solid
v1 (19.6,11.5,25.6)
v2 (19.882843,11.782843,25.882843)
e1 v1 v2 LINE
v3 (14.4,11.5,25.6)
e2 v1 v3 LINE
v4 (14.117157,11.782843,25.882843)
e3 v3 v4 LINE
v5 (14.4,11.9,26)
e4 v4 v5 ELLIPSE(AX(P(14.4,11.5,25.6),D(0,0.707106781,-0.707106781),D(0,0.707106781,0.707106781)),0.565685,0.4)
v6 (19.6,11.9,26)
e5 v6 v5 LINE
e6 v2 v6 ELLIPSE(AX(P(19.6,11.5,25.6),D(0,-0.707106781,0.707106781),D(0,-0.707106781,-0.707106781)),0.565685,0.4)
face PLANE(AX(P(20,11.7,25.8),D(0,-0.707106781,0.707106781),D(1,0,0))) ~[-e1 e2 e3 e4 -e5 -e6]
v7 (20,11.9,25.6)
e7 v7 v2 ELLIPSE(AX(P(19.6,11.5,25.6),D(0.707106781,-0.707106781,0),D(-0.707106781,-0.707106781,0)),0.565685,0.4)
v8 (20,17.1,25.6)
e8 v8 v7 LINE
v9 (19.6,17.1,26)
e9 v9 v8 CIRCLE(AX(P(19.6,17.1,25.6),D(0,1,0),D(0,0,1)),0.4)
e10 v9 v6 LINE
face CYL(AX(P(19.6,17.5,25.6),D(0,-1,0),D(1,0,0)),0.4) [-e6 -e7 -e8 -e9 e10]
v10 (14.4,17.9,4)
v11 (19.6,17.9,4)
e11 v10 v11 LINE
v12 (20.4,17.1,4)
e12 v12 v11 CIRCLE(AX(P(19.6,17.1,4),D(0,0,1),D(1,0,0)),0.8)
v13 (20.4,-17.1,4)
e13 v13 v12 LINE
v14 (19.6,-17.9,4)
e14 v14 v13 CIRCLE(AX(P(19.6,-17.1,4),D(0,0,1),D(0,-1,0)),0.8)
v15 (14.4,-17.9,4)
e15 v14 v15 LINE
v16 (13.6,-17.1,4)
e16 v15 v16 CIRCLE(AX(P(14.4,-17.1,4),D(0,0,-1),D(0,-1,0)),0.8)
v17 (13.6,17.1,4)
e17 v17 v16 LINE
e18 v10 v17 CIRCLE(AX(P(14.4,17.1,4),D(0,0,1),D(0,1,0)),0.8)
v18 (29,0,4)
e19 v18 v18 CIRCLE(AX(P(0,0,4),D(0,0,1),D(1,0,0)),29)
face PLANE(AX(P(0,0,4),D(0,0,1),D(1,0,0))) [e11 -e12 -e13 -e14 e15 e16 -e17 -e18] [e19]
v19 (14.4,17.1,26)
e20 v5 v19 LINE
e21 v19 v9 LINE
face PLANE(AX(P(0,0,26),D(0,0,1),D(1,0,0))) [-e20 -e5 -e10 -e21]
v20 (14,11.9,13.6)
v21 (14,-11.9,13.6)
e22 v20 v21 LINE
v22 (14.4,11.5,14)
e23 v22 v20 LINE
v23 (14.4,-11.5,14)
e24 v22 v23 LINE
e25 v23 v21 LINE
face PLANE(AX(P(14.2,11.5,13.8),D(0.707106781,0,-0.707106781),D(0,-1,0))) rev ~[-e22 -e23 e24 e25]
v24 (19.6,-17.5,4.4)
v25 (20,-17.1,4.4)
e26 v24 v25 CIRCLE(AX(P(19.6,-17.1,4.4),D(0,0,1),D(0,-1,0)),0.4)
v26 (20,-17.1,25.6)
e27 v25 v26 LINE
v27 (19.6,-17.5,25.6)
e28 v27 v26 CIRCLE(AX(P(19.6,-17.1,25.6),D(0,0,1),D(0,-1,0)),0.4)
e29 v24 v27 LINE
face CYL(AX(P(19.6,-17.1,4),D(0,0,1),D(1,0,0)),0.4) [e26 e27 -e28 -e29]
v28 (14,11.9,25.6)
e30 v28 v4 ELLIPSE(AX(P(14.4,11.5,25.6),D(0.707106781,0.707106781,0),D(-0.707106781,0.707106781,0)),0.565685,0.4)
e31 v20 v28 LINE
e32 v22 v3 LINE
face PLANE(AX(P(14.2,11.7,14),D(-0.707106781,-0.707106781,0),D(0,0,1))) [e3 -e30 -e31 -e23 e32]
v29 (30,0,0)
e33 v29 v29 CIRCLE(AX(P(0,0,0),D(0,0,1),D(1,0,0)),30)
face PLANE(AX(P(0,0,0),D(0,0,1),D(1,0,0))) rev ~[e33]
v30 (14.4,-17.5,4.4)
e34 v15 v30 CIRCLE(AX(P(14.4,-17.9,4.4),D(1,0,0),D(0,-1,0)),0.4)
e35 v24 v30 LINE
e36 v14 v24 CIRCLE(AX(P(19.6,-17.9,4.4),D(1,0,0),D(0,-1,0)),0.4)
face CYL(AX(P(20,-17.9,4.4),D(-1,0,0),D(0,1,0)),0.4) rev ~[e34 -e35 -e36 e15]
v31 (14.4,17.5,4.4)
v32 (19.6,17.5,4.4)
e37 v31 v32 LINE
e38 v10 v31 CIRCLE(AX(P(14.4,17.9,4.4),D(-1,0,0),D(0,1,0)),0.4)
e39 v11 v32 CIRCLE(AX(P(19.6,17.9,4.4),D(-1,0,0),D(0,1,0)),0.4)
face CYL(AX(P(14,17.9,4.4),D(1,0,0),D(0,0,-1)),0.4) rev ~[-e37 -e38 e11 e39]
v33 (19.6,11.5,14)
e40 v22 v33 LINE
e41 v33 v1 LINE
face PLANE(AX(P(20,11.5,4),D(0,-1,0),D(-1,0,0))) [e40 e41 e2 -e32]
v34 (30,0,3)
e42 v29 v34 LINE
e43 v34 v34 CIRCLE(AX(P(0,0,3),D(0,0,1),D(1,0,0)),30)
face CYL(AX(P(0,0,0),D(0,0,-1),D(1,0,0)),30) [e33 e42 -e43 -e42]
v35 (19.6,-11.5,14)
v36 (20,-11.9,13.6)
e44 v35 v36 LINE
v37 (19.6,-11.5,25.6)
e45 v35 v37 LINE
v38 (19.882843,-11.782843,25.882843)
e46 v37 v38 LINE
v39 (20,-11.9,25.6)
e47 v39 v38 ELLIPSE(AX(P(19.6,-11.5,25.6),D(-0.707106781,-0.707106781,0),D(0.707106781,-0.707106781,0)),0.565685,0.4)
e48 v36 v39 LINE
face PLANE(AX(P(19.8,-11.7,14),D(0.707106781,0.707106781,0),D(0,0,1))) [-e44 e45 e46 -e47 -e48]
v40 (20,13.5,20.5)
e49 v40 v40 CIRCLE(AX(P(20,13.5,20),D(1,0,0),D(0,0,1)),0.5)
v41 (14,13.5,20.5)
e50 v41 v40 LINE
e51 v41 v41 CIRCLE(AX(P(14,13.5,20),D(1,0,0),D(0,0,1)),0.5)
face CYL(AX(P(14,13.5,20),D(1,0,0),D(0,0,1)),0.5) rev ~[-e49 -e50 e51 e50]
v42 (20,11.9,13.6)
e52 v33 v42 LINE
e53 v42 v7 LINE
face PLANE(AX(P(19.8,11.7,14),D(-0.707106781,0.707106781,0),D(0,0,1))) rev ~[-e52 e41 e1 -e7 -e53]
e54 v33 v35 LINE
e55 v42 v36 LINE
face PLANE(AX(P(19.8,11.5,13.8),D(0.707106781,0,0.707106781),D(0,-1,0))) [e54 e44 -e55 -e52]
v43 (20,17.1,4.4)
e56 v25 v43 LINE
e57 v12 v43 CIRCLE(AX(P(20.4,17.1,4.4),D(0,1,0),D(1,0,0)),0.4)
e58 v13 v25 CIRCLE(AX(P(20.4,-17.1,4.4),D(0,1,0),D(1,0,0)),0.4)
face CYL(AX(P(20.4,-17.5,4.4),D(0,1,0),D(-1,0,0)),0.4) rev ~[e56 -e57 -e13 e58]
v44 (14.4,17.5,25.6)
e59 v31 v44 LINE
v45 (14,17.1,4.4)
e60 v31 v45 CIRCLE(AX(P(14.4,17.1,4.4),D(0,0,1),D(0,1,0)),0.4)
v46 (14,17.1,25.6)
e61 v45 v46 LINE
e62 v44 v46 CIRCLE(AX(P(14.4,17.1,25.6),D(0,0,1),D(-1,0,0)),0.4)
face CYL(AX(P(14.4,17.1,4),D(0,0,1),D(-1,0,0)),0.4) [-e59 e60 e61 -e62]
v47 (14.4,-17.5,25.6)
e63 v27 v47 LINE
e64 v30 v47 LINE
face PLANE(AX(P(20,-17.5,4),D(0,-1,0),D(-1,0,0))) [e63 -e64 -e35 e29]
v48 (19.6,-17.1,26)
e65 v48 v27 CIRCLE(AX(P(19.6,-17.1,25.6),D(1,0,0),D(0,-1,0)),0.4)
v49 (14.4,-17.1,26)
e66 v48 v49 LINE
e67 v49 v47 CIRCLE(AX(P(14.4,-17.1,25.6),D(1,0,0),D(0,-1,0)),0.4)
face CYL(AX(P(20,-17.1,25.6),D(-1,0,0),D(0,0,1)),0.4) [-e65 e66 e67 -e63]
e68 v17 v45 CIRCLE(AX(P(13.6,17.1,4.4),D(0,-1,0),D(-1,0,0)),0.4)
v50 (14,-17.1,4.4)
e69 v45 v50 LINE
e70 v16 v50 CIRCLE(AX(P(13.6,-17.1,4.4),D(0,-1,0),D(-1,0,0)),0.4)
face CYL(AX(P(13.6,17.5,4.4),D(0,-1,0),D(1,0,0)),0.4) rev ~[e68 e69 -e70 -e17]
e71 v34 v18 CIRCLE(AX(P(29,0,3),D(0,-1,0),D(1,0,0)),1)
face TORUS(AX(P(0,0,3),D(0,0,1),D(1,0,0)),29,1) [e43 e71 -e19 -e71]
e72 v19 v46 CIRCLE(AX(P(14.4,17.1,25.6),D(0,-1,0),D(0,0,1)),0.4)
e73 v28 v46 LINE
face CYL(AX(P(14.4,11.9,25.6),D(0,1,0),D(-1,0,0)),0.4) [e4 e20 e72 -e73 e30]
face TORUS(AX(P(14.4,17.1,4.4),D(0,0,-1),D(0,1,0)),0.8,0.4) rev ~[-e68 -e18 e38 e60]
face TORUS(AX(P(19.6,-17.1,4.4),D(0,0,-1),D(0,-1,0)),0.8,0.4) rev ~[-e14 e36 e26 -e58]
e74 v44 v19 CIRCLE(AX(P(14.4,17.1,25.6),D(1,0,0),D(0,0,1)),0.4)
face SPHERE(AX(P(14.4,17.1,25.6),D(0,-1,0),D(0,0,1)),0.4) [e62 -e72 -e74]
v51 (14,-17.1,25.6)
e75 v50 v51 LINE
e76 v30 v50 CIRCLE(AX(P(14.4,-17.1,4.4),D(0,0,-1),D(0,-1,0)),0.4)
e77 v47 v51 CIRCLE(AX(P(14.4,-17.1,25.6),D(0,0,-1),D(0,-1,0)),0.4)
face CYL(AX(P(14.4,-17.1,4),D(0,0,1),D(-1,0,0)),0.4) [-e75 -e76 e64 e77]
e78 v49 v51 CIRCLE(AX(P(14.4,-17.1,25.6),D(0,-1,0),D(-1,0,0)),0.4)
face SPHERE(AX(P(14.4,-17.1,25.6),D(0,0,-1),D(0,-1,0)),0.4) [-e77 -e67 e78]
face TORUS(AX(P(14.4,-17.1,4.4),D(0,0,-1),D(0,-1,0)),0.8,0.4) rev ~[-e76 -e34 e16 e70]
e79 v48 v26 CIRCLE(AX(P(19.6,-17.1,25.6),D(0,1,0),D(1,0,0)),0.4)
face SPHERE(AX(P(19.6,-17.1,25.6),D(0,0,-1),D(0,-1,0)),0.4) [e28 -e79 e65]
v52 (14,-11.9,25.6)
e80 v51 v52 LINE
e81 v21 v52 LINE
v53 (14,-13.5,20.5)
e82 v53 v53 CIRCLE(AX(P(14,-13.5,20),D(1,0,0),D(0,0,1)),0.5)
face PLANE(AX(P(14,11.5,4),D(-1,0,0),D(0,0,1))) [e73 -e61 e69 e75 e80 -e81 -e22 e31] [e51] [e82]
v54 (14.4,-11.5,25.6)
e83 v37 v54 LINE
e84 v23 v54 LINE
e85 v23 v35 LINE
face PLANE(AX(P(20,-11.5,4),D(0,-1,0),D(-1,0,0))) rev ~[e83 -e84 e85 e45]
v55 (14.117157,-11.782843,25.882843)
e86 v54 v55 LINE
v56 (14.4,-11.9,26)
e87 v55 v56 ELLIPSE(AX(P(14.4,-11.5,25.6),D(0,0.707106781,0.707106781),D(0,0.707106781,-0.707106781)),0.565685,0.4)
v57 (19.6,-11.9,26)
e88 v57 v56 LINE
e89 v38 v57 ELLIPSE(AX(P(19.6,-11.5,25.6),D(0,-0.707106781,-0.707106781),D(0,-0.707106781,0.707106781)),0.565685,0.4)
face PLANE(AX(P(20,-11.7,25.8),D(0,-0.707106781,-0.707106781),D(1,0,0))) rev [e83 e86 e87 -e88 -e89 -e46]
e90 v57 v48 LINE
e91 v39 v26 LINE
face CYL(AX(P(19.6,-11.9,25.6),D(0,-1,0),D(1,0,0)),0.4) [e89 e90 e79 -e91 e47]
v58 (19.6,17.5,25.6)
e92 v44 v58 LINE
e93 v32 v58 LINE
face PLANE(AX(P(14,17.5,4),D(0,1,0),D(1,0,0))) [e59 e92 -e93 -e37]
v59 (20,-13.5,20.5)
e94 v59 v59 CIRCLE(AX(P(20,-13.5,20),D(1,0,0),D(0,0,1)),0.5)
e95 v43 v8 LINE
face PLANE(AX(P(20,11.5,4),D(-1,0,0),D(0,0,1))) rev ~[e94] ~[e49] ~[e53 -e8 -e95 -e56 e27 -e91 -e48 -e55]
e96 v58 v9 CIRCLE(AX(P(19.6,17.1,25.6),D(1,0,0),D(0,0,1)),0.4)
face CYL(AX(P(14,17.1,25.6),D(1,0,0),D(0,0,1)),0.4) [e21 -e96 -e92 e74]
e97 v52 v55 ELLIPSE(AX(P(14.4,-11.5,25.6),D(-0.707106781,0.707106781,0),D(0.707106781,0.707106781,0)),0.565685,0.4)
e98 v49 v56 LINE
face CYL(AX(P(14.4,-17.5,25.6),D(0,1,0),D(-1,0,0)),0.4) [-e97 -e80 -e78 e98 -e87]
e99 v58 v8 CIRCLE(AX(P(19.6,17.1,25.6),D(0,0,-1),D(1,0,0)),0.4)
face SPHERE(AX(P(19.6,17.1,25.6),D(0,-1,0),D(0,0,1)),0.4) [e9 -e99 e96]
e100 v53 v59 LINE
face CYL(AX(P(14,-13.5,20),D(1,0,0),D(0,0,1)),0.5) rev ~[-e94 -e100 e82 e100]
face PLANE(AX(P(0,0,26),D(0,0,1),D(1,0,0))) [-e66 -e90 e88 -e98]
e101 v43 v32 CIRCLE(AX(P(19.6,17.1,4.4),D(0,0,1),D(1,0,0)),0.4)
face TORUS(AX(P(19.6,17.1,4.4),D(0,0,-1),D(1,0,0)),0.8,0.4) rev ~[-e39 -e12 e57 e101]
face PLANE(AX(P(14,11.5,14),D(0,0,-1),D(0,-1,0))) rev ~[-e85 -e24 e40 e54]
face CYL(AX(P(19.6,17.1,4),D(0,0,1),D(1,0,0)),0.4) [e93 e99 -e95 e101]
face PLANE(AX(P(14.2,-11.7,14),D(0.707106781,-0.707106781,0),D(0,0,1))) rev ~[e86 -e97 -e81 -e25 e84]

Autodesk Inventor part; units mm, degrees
ref_plane "YZ Plane" through (0, 0, 0) normal (1, 0, 0) x (0, 1, 0)
ref_plane "XZ Plane" through (0, 0, 0) normal (0, 1, 0) x (-1, 0, 0)
ref_plane "XY Plane" through (0, 0, 0) normal (0, 0, 1) x (1, 0, 0)
sketch "Skizze1" plane through (0, 0, 0) normal (0, 0, 1) x (1, 0, 0)
  circle A0 centre (0, 0) radius 30
  dimension "d0" = 60
extrude "Extrusion1" add sketch "Skizze1" along normal blind 4
sketch "Skizze2" plane through (0, 0, 4) normal (0, 0, 1) x (1, 0, 0)
  line L0 (14, 17.5) -> (20, 17.5)
  line L1 (20, -17.5) -> (14, -17.5)
  line L2 (20, 11.5) -> (14, 11.5)
  line L3 (20, -11.5) -> (14, -11.5)
  line L4 (-42, 0) -> (42, 0) projected
  line L5 (14, -17.5) -> (14, -11.5)
  line L6 (14, 11.5) -> (14, 17.5)
  line L7 (20, 17.5) -> (20, 11.5)
  line L8 (20, -11.5) -> (20, -17.5)
  point P0 (0, 0)
  point P1 (14, 0)
  dimension "d5" = 6
  dimension "d6" = 35
  dimension "d9" = 23
  dimension "d10" = 14
extrude "Extrusion2" add sketch "Skizze2" along normal blind 22
sketch "Skizze3" plane through (14, -17.5, 4) normal (-1, 0, 0) x (0, 0, 1)
  line L0 (22, 35) -> (22, 29) projected
  line L1 (22, 6) -> (22, 0) projected
  line L2 (0, 0) -> (22, 0) projected
  line L3 (-4, 17.5) -> (14.084, 17.5)
  line L4 (0, -12.5) -> (0, 47.5) projected
  point P0 (16, 4)
  point P1 (16, 31)
  point P2 (22, 3)
  point P3 (22, 32)
  dimension "d13" = 27
  dimension "d14" = 16
hole "Bohrung1" at (14, -13.5, 20) at (14, 13.5, 20) direction (1, 0, 0) diameter 1 depth 6.5 tip angle 118
fillet "Rundung2" radius 1 1 edges at (-30, 0, 4)
sketch "Skizze6" plane through (14, 11.5, 4) normal (-1, 0, 0) x (0, 0, 1)
  line L0 (0, -23) -> (22, -23) projected
  line L1 (0, 0) -> (22, 0) projected
  line L2 (0, 0) -> (10, 0)
  line L3 (10, 0) -> (10, -23)
  line L4 (10, -23) -> (0, -23)
  line L5 (0, -23) -> (0, 0)
  point P0 (-4, -11.5)
  point P1 (0.5, -23)
  point P2 (21.5, -23)
  point P3 (21.5, 0)
  point P4 (0.5, -23)
  point P5 (10, 0)
  dimension "d30" = 10
extrude "Extrusion4" add sketch "Skizze6" against normal up to surface (6 mm away)
chamfer "Fasen2" distance 0.4 angle 45 8 edges at (14, 11.5, 20) (17, 11.5, 26) (20, 11.5, 20) (14, 0, 14) (14, -11.5, 20) (17, -11.5, 26) (20, -11.5, 20) (20, 0, 14)
fillet "Rundung3" radius 0.4 14 edges at (14, 0, 4) (14, -17.5, 15) (20, -17.5, 15) (17, -17.5, 26) (20, -14.7, 26) (14, -14.7, 26) (14, 14.7, 26) (20, 14.7, 26) (17, 17.5, 26) (14, 17.5, 15) (17, -17.5, 4) (20, 17.5, 15) (20, 0, 4) (17, 17.5, 4)
properties part number "Shoulder"
